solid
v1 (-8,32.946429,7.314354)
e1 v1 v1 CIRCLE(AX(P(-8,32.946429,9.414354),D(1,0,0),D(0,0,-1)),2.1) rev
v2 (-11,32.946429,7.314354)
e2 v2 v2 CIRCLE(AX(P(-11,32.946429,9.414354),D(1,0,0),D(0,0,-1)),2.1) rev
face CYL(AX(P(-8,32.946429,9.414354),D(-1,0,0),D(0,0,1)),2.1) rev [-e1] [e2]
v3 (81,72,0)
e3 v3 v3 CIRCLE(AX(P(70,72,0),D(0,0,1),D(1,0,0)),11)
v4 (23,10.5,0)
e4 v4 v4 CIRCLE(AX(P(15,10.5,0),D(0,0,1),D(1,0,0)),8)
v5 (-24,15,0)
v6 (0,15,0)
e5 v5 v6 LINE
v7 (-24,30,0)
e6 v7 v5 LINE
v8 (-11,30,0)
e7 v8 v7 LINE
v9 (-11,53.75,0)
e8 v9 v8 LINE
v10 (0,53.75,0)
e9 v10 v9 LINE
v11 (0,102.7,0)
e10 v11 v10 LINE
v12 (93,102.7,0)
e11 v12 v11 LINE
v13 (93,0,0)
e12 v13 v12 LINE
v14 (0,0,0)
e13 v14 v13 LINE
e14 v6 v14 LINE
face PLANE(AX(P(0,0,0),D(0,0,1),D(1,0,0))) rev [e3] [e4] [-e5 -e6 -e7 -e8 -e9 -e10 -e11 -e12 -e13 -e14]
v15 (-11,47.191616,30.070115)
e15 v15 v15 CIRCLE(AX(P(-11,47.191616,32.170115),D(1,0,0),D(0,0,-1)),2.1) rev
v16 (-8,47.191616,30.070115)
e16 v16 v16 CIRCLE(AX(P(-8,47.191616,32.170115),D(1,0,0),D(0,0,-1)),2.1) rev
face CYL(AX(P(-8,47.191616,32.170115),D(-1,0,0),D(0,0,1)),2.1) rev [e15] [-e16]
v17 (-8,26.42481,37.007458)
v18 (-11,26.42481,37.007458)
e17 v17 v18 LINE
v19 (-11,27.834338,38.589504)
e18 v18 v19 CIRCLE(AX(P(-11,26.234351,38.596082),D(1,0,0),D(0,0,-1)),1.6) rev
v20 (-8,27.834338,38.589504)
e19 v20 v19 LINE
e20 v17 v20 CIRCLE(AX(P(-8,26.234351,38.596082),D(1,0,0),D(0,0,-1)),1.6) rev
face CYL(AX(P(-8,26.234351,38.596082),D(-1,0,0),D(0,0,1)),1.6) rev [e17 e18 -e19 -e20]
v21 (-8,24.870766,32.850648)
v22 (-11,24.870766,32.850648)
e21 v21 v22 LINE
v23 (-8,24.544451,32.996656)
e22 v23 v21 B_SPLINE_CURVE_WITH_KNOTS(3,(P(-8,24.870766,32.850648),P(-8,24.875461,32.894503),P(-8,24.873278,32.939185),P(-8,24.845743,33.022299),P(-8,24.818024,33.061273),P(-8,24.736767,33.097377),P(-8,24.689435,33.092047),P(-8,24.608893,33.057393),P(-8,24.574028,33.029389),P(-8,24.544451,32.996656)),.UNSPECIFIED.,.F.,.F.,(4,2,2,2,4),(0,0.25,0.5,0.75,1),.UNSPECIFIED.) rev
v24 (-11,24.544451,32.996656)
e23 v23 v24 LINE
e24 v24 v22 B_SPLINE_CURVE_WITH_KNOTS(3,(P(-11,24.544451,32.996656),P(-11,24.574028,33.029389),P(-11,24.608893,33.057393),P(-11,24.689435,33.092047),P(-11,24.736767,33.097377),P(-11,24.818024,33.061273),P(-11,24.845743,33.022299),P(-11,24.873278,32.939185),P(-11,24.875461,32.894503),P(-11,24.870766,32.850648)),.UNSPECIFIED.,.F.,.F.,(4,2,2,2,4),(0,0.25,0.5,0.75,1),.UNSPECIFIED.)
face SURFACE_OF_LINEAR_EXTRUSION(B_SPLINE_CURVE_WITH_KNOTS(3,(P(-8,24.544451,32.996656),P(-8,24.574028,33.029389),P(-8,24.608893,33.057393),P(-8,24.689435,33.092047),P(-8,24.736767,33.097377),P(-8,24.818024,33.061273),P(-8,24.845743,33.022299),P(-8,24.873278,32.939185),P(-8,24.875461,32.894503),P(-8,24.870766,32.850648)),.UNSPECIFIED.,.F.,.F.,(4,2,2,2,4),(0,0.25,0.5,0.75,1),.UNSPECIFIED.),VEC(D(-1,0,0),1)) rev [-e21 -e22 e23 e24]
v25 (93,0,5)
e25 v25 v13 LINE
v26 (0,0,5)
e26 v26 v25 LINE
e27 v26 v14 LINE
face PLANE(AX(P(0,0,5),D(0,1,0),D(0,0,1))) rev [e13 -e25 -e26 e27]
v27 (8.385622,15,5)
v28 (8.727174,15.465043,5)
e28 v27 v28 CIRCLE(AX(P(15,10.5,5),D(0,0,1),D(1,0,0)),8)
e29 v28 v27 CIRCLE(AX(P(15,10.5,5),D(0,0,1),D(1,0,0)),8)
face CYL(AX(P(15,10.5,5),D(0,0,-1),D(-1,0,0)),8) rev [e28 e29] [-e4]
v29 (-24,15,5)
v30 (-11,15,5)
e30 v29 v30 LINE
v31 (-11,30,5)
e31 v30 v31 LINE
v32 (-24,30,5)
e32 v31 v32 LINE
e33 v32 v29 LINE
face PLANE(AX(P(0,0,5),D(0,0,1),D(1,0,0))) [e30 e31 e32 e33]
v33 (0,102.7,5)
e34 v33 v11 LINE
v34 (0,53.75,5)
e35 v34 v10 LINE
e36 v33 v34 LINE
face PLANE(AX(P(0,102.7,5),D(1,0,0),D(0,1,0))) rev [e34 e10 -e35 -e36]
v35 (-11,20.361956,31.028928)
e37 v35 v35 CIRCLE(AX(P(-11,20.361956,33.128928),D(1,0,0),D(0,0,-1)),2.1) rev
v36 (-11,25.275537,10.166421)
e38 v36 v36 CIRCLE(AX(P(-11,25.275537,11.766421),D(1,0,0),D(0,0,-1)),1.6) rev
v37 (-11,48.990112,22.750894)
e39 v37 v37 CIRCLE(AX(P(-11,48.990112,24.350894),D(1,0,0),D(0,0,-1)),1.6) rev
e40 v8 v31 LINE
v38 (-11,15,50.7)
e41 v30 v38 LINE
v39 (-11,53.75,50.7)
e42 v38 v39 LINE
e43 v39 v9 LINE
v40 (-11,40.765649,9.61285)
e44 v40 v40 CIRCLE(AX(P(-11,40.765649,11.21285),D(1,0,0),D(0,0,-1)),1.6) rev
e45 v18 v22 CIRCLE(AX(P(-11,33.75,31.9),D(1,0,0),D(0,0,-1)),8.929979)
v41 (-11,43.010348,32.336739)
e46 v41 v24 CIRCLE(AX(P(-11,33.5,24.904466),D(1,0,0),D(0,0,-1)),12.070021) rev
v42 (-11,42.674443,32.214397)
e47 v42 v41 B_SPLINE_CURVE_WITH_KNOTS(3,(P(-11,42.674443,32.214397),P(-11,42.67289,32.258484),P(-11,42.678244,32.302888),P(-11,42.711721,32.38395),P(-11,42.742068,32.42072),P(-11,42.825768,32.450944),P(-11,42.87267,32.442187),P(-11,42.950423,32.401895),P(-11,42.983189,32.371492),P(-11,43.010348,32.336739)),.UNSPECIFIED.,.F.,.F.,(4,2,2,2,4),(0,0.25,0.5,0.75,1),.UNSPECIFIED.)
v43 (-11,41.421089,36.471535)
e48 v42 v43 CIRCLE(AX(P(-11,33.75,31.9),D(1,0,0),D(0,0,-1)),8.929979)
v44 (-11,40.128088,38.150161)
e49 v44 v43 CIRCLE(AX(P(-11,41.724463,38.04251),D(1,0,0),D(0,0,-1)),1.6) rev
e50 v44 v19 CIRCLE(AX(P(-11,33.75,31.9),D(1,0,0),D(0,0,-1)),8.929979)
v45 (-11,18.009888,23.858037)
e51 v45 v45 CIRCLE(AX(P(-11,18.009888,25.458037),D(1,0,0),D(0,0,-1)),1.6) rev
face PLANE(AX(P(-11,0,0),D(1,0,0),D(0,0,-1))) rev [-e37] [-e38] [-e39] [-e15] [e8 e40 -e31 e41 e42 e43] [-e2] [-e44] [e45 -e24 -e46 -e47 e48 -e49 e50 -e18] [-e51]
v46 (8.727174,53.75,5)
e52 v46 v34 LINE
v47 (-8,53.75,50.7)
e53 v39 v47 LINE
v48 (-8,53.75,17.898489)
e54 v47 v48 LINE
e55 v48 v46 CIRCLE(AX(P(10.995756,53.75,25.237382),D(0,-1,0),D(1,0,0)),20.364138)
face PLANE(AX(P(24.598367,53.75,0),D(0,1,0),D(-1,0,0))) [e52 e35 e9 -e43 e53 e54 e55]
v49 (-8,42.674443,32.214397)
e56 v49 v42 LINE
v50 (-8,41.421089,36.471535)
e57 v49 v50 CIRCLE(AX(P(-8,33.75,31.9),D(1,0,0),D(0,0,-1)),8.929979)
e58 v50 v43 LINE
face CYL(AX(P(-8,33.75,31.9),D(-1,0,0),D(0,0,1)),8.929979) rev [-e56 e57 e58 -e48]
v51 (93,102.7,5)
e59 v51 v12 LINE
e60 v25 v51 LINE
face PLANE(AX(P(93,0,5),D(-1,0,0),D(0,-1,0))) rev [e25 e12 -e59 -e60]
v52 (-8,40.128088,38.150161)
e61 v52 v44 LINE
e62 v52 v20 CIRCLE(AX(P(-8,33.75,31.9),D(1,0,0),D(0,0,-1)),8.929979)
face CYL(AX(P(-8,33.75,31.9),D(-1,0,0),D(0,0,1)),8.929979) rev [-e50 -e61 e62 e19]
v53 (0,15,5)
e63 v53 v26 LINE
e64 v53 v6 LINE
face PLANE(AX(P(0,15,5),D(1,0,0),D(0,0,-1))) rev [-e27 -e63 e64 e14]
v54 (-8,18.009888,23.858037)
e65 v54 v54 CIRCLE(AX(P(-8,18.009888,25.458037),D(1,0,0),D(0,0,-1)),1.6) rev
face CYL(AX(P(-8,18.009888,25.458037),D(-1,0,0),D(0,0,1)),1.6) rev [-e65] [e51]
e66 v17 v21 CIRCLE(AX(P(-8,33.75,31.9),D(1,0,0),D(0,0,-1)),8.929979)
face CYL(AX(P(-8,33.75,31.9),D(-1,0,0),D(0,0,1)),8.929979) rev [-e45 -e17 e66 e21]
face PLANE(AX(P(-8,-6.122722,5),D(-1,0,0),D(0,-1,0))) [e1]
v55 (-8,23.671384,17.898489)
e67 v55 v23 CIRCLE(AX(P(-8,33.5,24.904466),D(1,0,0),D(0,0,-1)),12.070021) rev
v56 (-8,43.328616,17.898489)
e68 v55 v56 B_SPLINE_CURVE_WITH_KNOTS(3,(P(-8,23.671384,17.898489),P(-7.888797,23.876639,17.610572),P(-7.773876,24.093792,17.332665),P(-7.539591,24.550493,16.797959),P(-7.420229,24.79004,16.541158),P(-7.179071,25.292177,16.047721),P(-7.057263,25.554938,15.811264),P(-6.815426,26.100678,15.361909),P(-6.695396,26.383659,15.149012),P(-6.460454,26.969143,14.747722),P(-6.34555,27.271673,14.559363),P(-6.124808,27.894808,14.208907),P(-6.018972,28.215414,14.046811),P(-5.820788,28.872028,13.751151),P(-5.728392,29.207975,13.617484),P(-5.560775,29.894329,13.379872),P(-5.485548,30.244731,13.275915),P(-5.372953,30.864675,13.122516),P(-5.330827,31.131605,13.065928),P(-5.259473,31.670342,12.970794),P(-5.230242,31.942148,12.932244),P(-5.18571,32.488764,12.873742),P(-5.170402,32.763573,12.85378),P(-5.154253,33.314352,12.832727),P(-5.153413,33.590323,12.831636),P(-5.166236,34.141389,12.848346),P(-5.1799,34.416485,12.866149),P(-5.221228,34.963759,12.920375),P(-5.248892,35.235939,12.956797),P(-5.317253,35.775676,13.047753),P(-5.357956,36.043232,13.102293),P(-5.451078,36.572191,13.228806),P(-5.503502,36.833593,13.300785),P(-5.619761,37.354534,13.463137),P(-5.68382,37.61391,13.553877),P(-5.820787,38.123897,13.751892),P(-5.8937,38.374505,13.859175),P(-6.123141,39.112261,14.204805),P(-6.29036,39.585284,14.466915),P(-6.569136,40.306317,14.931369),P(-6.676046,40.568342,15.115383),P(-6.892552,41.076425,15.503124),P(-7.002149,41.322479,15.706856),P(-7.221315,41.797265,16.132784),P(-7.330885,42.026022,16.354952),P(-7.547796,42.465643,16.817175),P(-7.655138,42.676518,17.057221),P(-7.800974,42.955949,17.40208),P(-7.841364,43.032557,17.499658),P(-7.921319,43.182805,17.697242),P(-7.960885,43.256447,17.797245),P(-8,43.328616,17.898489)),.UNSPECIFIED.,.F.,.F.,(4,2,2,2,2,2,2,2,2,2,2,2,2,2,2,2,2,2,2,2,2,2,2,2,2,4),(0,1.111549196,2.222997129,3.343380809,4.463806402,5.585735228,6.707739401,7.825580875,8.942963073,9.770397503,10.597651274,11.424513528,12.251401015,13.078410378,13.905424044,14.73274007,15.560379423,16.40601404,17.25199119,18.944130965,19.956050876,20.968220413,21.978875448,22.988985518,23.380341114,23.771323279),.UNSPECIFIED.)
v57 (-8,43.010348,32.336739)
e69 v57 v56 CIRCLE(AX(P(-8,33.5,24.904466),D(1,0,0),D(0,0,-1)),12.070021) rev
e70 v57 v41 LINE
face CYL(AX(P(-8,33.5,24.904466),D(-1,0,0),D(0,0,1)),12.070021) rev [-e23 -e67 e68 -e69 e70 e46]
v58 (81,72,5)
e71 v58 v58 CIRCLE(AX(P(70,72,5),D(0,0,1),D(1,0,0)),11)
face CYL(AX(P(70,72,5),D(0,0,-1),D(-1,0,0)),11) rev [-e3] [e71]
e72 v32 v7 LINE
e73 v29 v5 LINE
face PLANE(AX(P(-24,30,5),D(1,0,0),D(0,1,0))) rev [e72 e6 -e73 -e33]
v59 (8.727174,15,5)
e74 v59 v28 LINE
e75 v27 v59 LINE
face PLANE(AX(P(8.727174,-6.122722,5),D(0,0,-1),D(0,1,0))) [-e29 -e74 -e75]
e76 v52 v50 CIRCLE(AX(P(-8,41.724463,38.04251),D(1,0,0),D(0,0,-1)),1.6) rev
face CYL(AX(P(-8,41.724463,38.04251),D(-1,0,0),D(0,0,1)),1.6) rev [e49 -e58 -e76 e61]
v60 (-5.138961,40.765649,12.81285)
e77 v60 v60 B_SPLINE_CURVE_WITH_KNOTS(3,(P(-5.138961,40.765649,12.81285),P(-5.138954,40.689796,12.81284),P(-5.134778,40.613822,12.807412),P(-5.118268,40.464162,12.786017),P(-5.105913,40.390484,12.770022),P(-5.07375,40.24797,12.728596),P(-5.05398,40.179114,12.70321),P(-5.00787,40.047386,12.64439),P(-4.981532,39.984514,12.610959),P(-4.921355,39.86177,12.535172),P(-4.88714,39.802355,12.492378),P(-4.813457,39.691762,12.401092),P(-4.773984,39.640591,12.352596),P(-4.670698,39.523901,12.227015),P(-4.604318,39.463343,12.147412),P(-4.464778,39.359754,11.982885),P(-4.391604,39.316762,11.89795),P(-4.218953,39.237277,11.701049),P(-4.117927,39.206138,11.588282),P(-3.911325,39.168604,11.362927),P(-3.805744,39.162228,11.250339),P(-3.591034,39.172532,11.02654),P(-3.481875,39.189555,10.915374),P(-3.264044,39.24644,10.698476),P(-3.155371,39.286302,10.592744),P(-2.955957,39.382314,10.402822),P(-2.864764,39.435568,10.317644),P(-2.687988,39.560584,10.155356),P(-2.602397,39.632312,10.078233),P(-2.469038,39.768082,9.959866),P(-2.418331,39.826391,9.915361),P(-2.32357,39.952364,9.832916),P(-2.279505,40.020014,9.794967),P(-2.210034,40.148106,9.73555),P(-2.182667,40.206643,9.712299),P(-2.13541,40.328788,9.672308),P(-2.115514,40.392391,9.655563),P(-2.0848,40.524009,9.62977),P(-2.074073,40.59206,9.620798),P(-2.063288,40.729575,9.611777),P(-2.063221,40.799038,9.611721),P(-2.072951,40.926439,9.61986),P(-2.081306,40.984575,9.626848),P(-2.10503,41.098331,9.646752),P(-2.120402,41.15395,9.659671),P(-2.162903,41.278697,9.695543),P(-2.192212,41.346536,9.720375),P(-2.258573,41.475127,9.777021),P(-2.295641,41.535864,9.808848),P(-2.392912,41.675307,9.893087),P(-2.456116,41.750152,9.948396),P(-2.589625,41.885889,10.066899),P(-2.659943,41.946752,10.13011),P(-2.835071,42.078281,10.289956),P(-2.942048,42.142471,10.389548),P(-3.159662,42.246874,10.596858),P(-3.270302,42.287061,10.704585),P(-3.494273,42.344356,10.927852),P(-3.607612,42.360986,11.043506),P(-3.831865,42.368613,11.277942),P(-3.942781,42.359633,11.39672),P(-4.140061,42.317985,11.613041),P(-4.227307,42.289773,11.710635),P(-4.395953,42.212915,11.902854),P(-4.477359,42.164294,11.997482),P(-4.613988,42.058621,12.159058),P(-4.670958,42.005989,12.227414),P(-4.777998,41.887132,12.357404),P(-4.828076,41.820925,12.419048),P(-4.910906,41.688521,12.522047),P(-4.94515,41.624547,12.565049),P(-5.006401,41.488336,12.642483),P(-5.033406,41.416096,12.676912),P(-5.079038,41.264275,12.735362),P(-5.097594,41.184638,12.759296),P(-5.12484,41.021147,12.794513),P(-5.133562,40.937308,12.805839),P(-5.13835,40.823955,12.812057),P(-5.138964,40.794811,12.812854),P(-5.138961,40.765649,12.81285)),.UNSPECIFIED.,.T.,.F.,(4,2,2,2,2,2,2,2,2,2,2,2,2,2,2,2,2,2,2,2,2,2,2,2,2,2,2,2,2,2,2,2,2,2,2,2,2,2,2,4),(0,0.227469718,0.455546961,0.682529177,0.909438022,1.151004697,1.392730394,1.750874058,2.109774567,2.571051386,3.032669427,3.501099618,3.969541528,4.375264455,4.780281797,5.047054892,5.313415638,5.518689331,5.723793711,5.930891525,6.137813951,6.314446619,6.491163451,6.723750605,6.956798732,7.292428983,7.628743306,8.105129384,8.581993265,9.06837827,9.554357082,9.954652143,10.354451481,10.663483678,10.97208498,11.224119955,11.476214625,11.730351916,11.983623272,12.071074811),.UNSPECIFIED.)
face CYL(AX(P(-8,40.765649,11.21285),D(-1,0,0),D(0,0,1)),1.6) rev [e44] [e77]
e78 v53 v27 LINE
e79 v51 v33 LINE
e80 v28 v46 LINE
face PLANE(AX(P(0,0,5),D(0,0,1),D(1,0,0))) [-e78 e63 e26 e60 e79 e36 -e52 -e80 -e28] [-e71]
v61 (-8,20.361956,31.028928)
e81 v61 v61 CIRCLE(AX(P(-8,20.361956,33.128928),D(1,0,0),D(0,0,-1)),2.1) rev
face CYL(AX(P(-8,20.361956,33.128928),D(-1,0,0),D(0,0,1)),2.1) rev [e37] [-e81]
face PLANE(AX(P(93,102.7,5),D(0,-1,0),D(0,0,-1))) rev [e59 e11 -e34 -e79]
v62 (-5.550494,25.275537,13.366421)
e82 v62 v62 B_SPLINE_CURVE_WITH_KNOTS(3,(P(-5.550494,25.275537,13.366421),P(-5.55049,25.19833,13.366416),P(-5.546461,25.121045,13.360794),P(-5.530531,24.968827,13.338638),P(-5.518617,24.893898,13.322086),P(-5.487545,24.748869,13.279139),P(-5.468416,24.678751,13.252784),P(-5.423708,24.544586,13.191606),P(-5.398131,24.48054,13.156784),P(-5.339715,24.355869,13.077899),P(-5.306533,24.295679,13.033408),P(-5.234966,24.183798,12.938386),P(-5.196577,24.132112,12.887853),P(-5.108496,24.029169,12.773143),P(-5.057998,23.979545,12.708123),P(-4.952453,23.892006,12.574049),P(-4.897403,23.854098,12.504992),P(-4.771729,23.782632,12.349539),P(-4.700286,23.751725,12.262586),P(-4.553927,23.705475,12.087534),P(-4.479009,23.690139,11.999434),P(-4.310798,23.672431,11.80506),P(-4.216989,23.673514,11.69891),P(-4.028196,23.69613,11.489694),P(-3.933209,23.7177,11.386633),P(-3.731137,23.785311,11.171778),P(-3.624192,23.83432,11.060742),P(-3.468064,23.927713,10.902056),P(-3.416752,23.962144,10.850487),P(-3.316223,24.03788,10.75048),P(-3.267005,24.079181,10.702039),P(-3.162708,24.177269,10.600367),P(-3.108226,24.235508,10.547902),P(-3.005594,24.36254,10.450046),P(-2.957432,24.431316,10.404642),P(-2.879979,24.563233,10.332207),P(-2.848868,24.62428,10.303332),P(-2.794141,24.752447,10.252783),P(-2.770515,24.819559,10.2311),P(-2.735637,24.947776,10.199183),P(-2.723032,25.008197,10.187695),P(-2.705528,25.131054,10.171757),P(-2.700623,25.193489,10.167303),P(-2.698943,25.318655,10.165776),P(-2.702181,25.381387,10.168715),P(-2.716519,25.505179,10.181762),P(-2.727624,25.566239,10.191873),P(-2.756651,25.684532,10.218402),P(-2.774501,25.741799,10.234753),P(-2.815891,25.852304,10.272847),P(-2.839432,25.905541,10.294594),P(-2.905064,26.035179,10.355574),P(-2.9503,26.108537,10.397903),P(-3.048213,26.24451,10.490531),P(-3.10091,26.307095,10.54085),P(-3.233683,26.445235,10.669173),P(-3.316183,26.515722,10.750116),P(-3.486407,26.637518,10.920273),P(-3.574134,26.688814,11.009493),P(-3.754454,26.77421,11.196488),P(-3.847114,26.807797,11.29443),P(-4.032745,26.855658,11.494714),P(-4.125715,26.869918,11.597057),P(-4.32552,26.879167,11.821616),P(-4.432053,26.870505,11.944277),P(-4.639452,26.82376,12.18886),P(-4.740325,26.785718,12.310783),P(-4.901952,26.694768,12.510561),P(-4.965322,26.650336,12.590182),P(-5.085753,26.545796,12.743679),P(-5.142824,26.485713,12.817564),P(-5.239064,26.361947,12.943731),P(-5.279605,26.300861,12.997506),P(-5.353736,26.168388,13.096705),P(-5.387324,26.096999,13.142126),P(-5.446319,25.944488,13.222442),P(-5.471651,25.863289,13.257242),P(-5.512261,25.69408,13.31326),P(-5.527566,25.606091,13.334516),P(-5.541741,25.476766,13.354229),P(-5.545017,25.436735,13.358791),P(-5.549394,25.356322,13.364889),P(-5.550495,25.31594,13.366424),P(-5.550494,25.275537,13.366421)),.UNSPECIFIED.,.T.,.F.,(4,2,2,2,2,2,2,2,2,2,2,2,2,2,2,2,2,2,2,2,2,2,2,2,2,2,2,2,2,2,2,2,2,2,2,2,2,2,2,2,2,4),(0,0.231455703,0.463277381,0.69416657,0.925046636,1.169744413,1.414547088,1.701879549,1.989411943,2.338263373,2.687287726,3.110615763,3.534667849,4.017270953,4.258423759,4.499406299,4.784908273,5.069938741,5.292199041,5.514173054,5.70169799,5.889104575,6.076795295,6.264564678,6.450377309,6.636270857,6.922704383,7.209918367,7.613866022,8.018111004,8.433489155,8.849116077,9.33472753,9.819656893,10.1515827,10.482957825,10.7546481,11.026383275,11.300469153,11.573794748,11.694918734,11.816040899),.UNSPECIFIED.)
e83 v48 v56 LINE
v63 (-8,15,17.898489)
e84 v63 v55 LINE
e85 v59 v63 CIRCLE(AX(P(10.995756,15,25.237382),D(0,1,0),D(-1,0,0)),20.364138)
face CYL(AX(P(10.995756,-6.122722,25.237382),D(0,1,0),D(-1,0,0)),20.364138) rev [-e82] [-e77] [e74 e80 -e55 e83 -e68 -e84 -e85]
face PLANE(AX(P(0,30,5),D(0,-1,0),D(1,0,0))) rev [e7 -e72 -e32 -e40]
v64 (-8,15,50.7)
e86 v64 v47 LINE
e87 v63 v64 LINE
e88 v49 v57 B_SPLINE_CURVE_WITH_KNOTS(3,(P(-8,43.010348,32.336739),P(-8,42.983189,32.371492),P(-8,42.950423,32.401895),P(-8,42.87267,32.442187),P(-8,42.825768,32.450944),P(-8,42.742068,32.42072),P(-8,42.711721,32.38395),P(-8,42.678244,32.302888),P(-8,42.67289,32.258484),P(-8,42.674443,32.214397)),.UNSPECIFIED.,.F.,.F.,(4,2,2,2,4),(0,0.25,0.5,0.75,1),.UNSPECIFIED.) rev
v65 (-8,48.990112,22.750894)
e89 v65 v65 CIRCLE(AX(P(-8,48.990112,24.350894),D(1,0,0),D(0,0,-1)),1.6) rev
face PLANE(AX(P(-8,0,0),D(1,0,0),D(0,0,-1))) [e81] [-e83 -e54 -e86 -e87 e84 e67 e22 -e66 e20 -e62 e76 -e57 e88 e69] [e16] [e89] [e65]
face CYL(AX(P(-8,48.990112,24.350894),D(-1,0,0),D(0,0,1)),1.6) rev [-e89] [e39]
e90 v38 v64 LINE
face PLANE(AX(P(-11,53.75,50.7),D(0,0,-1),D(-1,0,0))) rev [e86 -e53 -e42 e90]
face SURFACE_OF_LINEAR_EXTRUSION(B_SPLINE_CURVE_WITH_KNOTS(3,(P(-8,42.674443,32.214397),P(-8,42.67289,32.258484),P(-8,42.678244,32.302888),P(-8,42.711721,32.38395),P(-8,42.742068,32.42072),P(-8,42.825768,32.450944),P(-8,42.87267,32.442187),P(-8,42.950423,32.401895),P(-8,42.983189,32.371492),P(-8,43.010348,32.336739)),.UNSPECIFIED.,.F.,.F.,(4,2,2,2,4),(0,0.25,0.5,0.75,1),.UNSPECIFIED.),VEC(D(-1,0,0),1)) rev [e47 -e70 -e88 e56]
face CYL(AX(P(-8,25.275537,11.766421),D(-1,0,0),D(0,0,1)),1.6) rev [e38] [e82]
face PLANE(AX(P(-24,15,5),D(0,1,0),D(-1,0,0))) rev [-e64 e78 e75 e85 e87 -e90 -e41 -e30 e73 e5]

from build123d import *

# Parameters (mm, degrees)
SKETCH1_R                 = 8
SKETCH1_R_2               = 11
BOSS_EXTRUDE1_DEPTH       = 5
BOSS_EXTRUDE2_DEPTH       = 11
BOSS_EXTRUDE3_OUTLINE_R   = 1.6
BOSS_EXTRUDE3_OUTLINE_R_2 = 2.1
BOSS_EXTRUDE3_DEPTH       = 3
SKETCH3_W                 = 15
SKETCH3_H                 = 38.75
CUT_EXTRUDE1_DEPTH        = 3
BOSS_EXTRUDE4_REACH       = 120.779
CUT_EXTRUDE3_START        = 3
CUT_EXTRUDE3_OUTLINE_R    = 1.6
CUT_EXTRUDE3_DEPTH        = 5.935416332


# Read off the part's stored shape, not the designer's step: Boss-Extrude3, Cut-Extrude3
with BuildPart() as part:
    # Sketch1 → Boss-Extrude1 (new body)
    with BuildSketch(Plane.XY):
        Polygon((-24, 15), (0, 15), (0, 0), (93, 0), (93, 102.7), (0, 102.7), (0, 30), (-24, 30), align=None)
        with Locations((15, 10.5)):
            Circle(SKETCH1_R, mode=Mode.SUBTRACT)
        with Locations((70, 72)):
            Circle(SKETCH1_R_2, mode=Mode.SUBTRACT)
    extrude(amount=BOSS_EXTRUDE1_DEPTH)

    # Sketch2 → Boss-Extrude2 (add)
    with BuildSketch(Plane(origin=(-11, 0, 0), x_dir=(0, 0, -1), z_dir=(1, 0, 0))):
        Polygon((-6.40446571, 53.75), (-6.40446571, 33.5), (-6.40446571, 30), (0, 30), (0, 53.75), align=None)
    extrude(amount=BOSS_EXTRUDE2_DEPTH)

    # Boss-Extrude3 outline → Boss-Extrude3 (add)
    with BuildSketch(Plane(origin=(-11, 0, 0), x_dir=(0, 0, -1), z_dir=(1, 0, 0))):
        Polygon((-65.7, 15), (-5, 15), (-5, 30), (-6.40446571, 30), (-6.40446571, 53.75), (-65.7, 53.75), align=None)
        with Locations((-25.458037139, 18.009888358)):
            Circle(BOSS_EXTRUDE3_OUTLINE_R, mode=Mode.SUBTRACT)
        with Locations((-33.128928451, 20.361955525)):
            Circle(BOSS_EXTRUDE3_OUTLINE_R_2, mode=Mode.SUBTRACT)
        with BuildLine():
            ThreePointArc((-36.471534651, 41.421088598), (-34.422063775, 42.316430041), (-32.214396715, 42.674443066))
            add(Edge.make_bspline(
                [(-32.214396715, 42.674443066), (-32.258484047, 42.672889926), (-32.30288803, 42.678244048), (-32.383949881, 42.711721435), (-32.420720422, 42.742067925), (-32.450943892, 42.825768035), (-32.442187299, 42.872669516), (-32.401895098, 42.950423281), (-32.37149194, 42.983188581), (-32.336739051, 43.010347732)],
                knots=[0, 0, 0, 0, 0.25, 0.25, 0.5, 0.5, 0.75, 0.75, 1, 1, 1, 1], degree=3))
            ThreePointArc((-32.336739051, 43.010347732), (-12.84214513, 33.068927831), (-32.99665635, 24.544451349))
            add(Edge.make_bspline(
                [(-32.99665635, 24.544451349), (-33.029388791, 24.574028225), (-33.057393425, 24.608892702), (-33.092046693, 24.689435058), (-33.097377316, 24.736767464), (-33.061272852, 24.818024197), (-33.022299349, 24.845743133), (-32.93918463, 24.87327764), (-32.894502735, 24.8754612), (-32.850648228, 24.870765952)],
                knots=[0, 0, 0, 0, 0.25, 0.25, 0.5, 0.5, 0.75, 0.75, 1, 1, 1, 1], degree=3))
            ThreePointArc((-32.850648228, 24.870765952), (-35.02712744, 25.385455582), (-37.007457913, 26.424810377))
            ThreePointArc((-37.007457913, 26.424810377), (-39.660439788, 25.039720747), (-38.589504277, 27.83433758))
            ThreePointArc((-38.589504277, 27.83433758), (-40.824282289, 34.06892783), (-38.150161467, 40.128088348))
            ThreePointArc((-38.150161467, 40.128088348), (-39.018876857, 42.992022649), (-36.471534651, 41.421088598))
        make_face(mode=Mode.SUBTRACT)
        with Locations((-11.766421235, 25.275537259)):
            Circle(BOSS_EXTRUDE3_OUTLINE_R, mode=Mode.SUBTRACT)
        with Locations((-9.414354068, 32.946428571)):
            Circle(BOSS_EXTRUDE3_OUTLINE_R_2, mode=Mode.SUBTRACT)
        with Locations((-11.212849807, 40.765648901)):
            Circle(BOSS_EXTRUDE3_OUTLINE_R, mode=Mode.SUBTRACT)
        with Locations((-32.170114611, 47.191615903)):
            Circle(BOSS_EXTRUDE3_OUTLINE_R_2, mode=Mode.SUBTRACT)
        with Locations((-24.350894282, 48.990111642)):
            Circle(BOSS_EXTRUDE3_OUTLINE_R, mode=Mode.SUBTRACT)
    extrude(amount=BOSS_EXTRUDE3_DEPTH)

    # Sketch3 → Cut-Extrude1 (cut)
    with BuildSketch(Plane(origin=(-8, 0, 0), x_dir=(0, 0, -1), z_dir=(1, 0, 0))):
        with Locations((-58.2, 34.375)):
            Rectangle(SKETCH3_W, SKETCH3_H)
    extrude(amount=-CUT_EXTRUDE1_DEPTH, mode=Mode.SUBTRACT)

    # Boss-Extrude4: up to this face of the body (flat: up to its plane)
    boss_extrude4_end = Plane(part.part.faces().sort_by_distance((-10.666861144, 15, 16.018028005))[0])
    # Sketch4 → Boss-Extrude4 (add, up to the picked face)
    with BuildSketch(Plane(origin=(0, 53.75, 0), x_dir=(1, 0, 0), z_dir=(0, 1, 0)), mode=Mode.PRIVATE) as boss_extrude4_sk1:
        with BuildLine():
            Line((8.727174225, -5), (-8, -5))
            Line((-8, -5), (-8, -17.898489496))
            ThreePointArc((-8, -17.898489496), (-1.439507221, -9.110934277), (8.727174225, -5))
        make_face()
    boss_extrude4_tool1 = split(extrude(boss_extrude4_sk1.sketch, amount=-BOSS_EXTRUDE4_REACH, mode=Mode.PRIVATE), bisect_by=boss_extrude4_end, keep=Keep.BOTH, mode=Mode.PRIVATE)
    add(boss_extrude4_tool1.solids().sort_by(Axis((-3.750344, 53.75, 8.522384), (0, -1, 0)))[0])

    # Cut-Extrude3 outline → Cut-Extrude3 (cut)
    with BuildSketch(Plane(origin=(-11, 0, 0), x_dir=(0, 0, -1), z_dir=(1, 0, 0)).offset(CUT_EXTRUDE3_START)):
        with BuildLine():
            ThreePointArc((-19, 22.972764576), (-12.834444956, 33.5), (-19, 44.027235424))
            Line((-19, 44.027235424), (-19, 22.972764576))
        make_face()
        with Locations((-11.766421235, 25.275537259)):
            Circle(CUT_EXTRUDE3_OUTLINE_R)
        with Locations((-11.212849807, 40.765648901)):
            Circle(CUT_EXTRUDE3_OUTLINE_R)
    extrude(amount=CUT_EXTRUDE3_DEPTH, mode=Mode.SUBTRACT)


solid = part.part
